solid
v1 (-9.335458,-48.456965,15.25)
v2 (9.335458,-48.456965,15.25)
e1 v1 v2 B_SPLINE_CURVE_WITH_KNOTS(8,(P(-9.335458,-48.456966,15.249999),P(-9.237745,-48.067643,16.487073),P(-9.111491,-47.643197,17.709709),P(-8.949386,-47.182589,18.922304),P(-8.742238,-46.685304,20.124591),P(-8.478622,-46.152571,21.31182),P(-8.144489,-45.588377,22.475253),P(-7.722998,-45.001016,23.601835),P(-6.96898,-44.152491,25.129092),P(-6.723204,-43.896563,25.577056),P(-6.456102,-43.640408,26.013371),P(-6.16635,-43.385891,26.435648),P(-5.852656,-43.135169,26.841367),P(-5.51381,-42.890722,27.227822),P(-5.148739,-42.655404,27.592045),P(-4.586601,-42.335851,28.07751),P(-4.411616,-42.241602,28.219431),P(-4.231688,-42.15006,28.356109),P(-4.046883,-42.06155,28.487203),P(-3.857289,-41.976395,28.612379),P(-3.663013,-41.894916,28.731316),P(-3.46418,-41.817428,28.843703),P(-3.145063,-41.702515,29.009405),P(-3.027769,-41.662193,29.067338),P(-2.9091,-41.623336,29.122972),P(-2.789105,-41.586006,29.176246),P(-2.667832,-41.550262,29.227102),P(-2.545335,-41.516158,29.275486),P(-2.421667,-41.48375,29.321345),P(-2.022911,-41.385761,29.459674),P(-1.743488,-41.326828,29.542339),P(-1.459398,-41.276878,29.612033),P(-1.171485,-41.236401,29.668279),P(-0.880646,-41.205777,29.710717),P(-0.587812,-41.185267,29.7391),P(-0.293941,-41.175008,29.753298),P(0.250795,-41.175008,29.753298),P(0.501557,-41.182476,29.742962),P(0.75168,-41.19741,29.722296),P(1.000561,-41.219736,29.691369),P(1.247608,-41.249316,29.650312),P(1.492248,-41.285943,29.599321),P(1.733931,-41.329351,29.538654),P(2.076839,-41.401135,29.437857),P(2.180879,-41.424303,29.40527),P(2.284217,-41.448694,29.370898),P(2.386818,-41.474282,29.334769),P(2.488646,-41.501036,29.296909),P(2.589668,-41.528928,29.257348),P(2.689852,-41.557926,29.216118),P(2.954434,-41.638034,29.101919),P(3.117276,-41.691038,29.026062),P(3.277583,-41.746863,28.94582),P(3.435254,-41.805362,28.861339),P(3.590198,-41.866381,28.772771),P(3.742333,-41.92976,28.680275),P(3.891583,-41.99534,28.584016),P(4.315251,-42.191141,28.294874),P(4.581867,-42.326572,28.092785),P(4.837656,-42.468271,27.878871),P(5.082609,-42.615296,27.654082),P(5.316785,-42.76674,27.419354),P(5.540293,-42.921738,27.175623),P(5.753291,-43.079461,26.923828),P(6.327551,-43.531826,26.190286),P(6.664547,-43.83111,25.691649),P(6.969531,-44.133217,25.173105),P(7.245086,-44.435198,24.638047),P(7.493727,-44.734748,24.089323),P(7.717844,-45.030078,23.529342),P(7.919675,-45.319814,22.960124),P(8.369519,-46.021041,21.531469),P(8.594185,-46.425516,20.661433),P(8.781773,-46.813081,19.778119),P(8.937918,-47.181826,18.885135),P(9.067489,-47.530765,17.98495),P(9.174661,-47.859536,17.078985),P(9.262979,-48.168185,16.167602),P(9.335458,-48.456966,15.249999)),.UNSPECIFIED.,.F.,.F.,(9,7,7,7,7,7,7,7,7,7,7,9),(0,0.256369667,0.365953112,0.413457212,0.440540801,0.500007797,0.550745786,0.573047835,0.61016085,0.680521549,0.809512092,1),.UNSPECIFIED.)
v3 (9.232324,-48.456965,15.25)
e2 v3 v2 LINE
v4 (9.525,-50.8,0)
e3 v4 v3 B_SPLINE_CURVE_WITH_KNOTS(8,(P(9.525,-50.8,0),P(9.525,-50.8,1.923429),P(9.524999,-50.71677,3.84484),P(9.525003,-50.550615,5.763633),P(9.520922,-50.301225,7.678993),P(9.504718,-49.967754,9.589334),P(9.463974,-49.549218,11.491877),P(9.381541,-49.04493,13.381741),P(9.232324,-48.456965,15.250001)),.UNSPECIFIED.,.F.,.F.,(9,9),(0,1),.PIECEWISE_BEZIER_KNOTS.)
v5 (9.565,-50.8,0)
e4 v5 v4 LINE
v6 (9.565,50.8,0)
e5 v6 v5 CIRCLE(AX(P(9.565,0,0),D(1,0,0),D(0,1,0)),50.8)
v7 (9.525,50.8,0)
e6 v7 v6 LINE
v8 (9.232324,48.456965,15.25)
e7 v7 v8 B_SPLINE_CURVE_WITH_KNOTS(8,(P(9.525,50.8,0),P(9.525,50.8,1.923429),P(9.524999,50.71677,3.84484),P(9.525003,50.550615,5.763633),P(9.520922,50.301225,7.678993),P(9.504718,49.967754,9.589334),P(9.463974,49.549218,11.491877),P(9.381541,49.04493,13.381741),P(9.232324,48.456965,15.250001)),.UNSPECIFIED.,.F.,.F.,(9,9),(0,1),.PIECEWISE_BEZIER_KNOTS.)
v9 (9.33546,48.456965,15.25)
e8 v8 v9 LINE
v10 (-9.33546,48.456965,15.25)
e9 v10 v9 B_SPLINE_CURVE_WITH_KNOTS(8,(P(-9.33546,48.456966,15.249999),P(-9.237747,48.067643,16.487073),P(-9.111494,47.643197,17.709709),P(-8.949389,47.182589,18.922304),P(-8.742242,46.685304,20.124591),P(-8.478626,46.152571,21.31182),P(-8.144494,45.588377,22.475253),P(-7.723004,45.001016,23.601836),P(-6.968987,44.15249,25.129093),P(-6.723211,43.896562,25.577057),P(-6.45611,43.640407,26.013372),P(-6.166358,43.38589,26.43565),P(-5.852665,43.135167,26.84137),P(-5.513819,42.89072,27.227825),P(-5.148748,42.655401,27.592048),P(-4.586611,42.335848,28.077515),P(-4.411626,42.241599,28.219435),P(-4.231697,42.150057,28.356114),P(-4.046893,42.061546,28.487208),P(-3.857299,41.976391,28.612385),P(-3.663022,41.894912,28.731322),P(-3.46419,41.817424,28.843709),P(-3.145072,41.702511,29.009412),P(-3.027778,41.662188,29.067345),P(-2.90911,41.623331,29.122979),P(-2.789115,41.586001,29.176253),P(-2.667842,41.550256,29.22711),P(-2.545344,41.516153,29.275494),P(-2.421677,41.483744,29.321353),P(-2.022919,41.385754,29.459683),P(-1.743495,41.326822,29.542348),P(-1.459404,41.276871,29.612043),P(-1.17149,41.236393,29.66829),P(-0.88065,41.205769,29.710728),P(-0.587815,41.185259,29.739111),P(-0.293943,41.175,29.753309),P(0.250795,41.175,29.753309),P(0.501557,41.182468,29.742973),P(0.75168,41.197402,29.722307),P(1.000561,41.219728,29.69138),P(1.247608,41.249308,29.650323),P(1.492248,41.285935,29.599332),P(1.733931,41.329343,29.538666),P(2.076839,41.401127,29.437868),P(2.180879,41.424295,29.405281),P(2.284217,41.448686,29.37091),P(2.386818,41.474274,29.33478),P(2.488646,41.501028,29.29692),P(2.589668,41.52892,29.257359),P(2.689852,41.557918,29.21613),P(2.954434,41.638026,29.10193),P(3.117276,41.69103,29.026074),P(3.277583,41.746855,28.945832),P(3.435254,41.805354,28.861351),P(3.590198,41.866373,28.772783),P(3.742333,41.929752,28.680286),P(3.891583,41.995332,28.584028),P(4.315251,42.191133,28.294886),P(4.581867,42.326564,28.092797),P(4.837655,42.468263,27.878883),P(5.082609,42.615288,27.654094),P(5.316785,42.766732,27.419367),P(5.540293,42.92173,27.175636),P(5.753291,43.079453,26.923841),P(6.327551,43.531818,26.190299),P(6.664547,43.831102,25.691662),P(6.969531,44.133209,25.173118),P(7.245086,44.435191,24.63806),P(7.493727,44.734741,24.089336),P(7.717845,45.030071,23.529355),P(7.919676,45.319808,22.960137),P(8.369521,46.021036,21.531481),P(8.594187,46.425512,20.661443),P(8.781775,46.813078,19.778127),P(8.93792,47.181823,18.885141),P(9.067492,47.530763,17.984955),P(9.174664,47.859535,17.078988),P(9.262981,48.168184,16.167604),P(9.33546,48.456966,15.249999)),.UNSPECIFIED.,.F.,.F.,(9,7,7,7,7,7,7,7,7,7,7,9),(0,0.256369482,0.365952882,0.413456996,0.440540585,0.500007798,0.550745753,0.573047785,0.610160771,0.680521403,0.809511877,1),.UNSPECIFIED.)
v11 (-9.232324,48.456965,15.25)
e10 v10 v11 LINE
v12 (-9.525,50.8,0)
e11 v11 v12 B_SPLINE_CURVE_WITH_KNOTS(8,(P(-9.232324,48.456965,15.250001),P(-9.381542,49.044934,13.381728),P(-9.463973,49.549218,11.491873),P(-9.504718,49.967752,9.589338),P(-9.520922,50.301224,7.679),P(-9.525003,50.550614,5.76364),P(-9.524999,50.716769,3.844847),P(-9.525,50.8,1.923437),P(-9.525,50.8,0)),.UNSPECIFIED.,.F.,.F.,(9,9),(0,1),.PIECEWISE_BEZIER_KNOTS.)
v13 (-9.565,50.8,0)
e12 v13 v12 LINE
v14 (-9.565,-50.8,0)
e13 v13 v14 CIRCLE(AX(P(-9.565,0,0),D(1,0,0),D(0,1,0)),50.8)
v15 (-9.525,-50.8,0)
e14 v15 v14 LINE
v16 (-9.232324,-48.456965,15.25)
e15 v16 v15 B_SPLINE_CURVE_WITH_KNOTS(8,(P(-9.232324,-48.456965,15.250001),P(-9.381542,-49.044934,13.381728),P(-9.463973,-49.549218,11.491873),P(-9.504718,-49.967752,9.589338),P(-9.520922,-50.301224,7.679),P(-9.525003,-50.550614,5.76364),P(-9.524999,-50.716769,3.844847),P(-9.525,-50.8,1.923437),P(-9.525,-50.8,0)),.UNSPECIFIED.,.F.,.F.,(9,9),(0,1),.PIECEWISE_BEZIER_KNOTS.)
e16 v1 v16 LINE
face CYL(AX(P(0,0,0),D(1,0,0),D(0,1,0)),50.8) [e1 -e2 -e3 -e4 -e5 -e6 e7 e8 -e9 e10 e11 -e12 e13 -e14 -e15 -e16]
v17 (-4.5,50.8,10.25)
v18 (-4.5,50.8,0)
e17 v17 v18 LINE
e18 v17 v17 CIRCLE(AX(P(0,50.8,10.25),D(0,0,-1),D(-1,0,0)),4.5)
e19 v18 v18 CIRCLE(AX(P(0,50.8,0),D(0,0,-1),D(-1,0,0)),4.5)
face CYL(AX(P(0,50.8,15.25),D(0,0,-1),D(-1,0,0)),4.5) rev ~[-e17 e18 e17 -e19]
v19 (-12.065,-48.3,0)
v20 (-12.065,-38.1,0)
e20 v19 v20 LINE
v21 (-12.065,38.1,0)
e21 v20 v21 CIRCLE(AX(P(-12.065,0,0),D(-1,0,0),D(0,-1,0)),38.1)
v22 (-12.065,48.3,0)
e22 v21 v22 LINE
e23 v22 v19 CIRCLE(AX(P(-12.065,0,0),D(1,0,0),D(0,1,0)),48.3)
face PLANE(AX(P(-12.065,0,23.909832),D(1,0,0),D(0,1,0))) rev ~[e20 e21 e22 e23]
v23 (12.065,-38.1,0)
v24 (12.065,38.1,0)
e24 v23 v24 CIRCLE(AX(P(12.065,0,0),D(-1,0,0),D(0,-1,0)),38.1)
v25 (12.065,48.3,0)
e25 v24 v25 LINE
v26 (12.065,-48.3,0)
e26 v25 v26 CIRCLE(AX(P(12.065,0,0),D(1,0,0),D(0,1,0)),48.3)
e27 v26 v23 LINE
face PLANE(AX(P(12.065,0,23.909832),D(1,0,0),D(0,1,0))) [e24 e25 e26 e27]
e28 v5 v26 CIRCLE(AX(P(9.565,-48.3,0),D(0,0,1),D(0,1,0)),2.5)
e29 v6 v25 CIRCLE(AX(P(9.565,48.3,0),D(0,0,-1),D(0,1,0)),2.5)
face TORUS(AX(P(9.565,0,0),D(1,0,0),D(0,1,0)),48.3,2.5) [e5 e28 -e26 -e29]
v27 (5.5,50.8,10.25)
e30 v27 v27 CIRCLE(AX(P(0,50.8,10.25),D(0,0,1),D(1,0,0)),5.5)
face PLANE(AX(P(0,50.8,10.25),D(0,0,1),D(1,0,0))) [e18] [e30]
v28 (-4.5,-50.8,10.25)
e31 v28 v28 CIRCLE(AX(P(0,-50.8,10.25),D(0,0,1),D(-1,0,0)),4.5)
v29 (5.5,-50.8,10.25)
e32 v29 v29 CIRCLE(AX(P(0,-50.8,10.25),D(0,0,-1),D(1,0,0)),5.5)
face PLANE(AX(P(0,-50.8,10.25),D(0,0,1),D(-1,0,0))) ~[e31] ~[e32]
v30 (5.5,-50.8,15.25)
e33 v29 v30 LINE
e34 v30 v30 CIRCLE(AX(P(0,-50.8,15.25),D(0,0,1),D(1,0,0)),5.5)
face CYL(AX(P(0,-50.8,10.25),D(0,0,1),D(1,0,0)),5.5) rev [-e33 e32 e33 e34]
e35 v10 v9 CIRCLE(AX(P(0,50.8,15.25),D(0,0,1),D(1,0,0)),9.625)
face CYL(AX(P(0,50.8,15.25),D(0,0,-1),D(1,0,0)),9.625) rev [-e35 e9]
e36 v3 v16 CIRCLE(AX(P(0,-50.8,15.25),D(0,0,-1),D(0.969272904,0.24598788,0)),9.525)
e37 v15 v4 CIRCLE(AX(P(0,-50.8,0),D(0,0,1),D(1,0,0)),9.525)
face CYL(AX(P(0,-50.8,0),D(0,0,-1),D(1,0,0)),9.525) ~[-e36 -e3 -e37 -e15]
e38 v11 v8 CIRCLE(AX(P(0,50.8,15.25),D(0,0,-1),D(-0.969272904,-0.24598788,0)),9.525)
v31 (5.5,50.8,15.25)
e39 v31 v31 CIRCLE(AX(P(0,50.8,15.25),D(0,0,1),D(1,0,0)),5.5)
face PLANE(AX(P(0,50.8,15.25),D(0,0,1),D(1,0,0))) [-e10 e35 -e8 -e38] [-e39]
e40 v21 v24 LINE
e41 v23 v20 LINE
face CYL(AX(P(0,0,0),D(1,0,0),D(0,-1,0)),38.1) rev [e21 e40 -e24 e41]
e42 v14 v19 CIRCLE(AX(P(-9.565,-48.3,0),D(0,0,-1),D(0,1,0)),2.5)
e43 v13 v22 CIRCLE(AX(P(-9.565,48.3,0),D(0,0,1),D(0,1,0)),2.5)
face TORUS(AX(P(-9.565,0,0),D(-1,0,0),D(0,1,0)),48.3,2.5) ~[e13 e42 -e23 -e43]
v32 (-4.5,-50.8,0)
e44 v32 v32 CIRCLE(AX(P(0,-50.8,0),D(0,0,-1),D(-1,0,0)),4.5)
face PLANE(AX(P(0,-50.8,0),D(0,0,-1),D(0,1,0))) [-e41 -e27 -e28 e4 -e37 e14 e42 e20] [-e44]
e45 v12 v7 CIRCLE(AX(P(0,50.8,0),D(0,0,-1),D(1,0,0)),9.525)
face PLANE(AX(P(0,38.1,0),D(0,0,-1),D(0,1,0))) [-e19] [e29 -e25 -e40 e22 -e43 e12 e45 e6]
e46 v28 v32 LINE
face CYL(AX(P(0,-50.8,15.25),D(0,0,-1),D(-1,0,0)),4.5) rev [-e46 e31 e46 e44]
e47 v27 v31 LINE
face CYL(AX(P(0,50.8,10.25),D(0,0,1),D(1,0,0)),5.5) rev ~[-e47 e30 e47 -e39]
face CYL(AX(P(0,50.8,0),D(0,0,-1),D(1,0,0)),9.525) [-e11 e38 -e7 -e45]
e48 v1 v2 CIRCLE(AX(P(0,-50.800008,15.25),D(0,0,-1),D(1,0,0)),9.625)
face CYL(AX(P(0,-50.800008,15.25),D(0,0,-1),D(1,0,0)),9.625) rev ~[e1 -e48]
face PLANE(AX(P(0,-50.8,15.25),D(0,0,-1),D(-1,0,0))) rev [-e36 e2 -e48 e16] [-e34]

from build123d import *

# Parameters (mm, degrees)
F1_DEPTH       = 12.065
F2_R           = 9.525
F3_DEPTH       = 15.25
F4_R           = 9.625
F5_DEPTH       = 25
F7_D           = 9
F7_DEPTH       = 75
F7_CBORE_D     = 11
F7_CBORE_DEPTH = 5
F7_TIP         = 2.7038727856
F8_R           = 2.5


# Not quite as in the source:
# - a pattern or mirror of a feature is missing from the dataset's text; its kind, count and spacing are read off the source's solid


with BuildPart() as f1:
    # F0 (on Right) → F1 (new body, symmetric)
    with BuildSketch(Plane.YZ):
        with BuildLine():
            ThreePointArc((-38.1, 0), (0, 38.1), (38.1, 0))
            Line((38.1, 0), (50.8, 0))
            ThreePointArc((50.8, 0), (0, 50.8), (-50.8, 0))
            Line((-50.8, 0), (-38.1, 0))
        make_face()
    extrude(amount=F1_DEPTH, both=True)

    # F2 (on face) → F3 (join)
    with BuildSketch(Plane(origin=(0, 0, 0), x_dir=(1, 0, 0), z_dir=(0, 0, -1))):
        with Locations((0, -50.8)):
            Circle(F2_R)
    f3 = extrude(amount=-F3_DEPTH)

    # F3_copies: F3 across plane
    add(f3.mirror(Plane(origin=(0, 0, 0), x_dir=(0, 0, -1), z_dir=(0, -1, 0))))

    # F4 (on face) → F5 (cut)
    with BuildSketch(Plane.XY.offset(15.25)):
        with Locations((0, 50.8)):
            Circle(F4_R)
    f5 = extrude(amount=F5_DEPTH, mode=Mode.SUBTRACT)

    # F5_copies: F5 across plane
    add(f5.mirror(Plane(origin=(0, -4e-06, 0), x_dir=(0, 0, -1), z_dir=(0, -1, 0))), mode=Mode.SUBTRACT)

    # F7
    with Locations(Plane.XY.offset(15.25)):
        with Locations((0, 50.8)):
            f7 = CounterBoreHole(F7_D / 2, F7_CBORE_D / 2, F7_CBORE_DEPTH, depth=F7_DEPTH)
            with Locations((0, 0, -(F7_DEPTH + F7_TIP / 2))):  # 118° drill point
                Cone(0, F7_D / 2, F7_TIP, mode=Mode.SUBTRACT)

    # F7_copies: F7 across plane
    add(f7.mirror(Plane(origin=(0, 0, 0), x_dir=(0, 0, -1), z_dir=(0, -1, 0))), mode=Mode.SUBTRACT)

    # F8
    f8_edges = [f1.edges().sort_by_distance(p)[0] for p in [
        (12.065, 0, 50.8),
        (-12.065, 0, 50.8),
    ]]
    fillet(f8_edges, radius=F8_R)


solid = f1.part
